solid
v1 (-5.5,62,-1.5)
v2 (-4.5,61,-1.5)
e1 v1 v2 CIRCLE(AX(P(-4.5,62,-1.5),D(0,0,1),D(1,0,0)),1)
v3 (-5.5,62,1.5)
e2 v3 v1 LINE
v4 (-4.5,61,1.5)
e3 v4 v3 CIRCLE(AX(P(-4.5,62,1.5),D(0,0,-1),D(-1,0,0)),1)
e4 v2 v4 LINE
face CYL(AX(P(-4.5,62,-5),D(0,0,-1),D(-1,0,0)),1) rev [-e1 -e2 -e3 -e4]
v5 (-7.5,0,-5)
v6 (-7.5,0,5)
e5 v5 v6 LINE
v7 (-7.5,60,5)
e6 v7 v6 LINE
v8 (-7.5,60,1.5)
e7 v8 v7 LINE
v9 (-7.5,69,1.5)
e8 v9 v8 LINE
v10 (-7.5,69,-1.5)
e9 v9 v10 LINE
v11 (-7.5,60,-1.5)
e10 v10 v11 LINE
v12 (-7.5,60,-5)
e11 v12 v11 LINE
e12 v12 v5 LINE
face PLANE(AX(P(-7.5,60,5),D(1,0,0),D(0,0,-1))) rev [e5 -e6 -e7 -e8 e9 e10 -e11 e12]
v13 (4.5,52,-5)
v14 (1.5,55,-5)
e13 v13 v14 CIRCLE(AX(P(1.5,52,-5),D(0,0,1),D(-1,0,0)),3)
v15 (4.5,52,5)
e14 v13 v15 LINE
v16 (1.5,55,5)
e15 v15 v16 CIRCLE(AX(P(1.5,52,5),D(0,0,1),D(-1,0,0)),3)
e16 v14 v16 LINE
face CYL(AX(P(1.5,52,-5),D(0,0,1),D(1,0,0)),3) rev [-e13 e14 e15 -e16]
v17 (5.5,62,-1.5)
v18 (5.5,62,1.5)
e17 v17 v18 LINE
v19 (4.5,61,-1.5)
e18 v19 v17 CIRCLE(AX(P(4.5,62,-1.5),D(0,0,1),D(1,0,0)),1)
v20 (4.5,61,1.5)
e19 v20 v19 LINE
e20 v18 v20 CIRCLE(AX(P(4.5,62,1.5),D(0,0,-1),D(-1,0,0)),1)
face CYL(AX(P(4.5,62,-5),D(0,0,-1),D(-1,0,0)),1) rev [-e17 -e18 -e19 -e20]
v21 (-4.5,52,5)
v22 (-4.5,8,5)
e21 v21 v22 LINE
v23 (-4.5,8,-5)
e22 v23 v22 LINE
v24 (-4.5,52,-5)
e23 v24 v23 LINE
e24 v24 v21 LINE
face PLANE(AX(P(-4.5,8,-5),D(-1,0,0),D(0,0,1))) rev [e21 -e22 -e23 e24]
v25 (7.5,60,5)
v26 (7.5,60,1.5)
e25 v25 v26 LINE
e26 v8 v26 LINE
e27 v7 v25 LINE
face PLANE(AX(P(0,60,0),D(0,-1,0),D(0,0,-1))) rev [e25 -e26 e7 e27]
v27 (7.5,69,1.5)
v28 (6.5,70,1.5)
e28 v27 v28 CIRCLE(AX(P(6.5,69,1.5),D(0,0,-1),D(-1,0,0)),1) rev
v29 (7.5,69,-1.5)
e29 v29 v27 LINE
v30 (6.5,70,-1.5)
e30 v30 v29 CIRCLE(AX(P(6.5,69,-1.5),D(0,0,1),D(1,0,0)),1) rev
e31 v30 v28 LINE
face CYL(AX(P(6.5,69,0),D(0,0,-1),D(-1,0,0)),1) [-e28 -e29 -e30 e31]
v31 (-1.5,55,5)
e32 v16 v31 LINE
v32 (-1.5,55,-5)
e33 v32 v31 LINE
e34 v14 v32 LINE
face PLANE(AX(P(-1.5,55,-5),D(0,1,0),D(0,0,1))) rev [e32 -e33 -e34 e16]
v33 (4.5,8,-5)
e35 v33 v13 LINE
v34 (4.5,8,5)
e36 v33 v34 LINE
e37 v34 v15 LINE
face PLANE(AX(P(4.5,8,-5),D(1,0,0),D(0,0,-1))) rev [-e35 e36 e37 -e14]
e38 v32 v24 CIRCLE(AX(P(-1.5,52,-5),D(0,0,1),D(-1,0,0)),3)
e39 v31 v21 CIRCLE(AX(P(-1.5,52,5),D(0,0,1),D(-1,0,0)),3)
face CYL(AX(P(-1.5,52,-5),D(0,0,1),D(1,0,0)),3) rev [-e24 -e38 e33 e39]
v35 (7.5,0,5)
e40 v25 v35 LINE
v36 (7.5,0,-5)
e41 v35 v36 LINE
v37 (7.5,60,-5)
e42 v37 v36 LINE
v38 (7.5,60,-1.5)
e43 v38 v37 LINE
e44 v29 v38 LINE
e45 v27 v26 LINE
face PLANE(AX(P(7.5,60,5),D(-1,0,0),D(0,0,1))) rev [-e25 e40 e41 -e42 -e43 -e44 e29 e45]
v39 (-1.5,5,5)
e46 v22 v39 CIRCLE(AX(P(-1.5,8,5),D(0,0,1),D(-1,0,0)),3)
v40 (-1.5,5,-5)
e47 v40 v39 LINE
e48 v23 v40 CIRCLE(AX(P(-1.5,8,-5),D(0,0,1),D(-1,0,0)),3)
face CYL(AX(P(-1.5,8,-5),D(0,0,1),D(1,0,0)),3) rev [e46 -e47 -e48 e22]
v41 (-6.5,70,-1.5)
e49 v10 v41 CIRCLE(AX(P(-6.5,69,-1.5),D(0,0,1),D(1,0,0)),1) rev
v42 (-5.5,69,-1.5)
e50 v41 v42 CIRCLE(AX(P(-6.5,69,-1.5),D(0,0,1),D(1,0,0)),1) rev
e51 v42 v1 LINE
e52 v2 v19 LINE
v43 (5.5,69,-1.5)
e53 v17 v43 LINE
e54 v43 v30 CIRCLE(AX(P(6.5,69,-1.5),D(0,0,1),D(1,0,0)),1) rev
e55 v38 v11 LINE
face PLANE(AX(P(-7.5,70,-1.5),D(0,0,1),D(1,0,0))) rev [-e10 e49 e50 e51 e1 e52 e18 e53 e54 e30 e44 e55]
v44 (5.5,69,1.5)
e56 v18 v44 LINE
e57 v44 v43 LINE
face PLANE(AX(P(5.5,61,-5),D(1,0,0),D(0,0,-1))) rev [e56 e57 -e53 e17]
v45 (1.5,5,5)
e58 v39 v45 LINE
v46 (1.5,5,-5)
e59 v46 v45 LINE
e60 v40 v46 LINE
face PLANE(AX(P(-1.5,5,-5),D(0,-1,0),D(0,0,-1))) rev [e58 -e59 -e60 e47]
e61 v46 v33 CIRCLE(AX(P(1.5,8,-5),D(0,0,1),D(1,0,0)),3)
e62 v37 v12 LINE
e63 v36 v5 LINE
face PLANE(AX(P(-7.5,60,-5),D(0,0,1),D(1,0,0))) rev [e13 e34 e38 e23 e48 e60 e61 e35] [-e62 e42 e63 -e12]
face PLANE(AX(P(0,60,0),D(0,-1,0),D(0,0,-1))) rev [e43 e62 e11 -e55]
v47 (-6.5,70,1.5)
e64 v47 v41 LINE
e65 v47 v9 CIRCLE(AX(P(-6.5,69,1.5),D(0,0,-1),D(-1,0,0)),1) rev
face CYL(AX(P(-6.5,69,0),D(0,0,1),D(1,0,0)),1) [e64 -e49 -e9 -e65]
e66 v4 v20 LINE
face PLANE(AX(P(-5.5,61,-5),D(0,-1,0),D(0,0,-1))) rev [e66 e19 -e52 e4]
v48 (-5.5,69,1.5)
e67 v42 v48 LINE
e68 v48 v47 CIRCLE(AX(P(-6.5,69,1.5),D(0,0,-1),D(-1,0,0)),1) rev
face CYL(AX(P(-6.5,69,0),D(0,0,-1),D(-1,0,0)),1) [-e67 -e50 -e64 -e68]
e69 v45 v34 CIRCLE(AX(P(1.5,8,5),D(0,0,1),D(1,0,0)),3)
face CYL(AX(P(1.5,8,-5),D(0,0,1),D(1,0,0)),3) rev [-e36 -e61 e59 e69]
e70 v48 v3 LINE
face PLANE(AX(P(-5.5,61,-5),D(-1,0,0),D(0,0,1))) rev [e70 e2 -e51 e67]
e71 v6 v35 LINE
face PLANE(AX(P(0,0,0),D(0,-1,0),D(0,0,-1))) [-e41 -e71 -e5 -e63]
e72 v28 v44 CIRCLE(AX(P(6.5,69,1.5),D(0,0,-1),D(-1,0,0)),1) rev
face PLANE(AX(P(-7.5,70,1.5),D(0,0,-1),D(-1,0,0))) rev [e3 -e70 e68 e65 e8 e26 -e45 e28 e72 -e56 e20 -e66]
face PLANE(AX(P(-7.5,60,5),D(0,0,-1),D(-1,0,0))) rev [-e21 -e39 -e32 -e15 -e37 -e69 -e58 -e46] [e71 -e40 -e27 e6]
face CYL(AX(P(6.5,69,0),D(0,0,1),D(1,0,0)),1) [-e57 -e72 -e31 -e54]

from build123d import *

# Parameters (mm, degrees)
SKETCH1_W           = 15
SKETCH1_H           = 10
BOSS_EXTRUDE1_DEPTH = 60
SKETCH2_W           = 15
SKETCH2_H           = 3
BOSS_EXTRUDE2_DEPTH = 10
SKETCH3_W           = 11
SKETCH3_H           = 18.791084145
CUT_EXTRUDE1_DEPTH  = 71.700070721
FILLET1_R           = 1
CUT_EXTRUDE2_DEPTH  = 72.107313267


with BuildPart() as part:
    # Sketch1 → Boss-Extrude1 (new body)
    with BuildSketch(Plane(origin=(0, 0, 0), x_dir=(1, 0, 0), z_dir=(0, 1, 0))):
        Rectangle(SKETCH1_W, SKETCH1_H)
    extrude(amount=BOSS_EXTRUDE1_DEPTH)

    # Sketch2 → Boss-Extrude2 (add)
    with BuildSketch(Plane(origin=(0, 60, 0), x_dir=(1, 0, 0), z_dir=(0, 1, 0))):
        Rectangle(SKETCH2_W, SKETCH2_H)
    extrude(amount=BOSS_EXTRUDE2_DEPTH)

    # Sketch3 → Cut-Extrude1 (cut, through all)
    with BuildSketch(Plane.XY.offset(1.5)):
        with Locations((0, 70.395542073)):
            Rectangle(SKETCH3_W, SKETCH3_H)
    extrude(amount=-CUT_EXTRUDE1_DEPTH, mode=Mode.SUBTRACT)

    # Fillet1
    fillet1_edges = [part.edges().sort_by_distance(p)[0] for p in [
        (-5.5, 70, 0),
        (5.5, 70, 0),
        (5.5, 61, 0),
        (-5.5, 61, 0),
        (-7.5, 70, 0),
        (7.5, 70, 0),
    ]]
    fillet(fillet1_edges, radius=FILLET1_R - 0.0001)  # a hair under: the kernel refuses the full size

    # Sketch4 → Cut-Extrude2 (cut, through all)
    with BuildSketch(Plane.XY.offset(5)):
        with BuildLine():
            Line((-1.5, 5), (1.5, 5))
            ThreePointArc((1.5, 5), (3.621320344, 5.878679656), (4.5, 8))
            Line((4.5, 8), (4.5, 52))
            ThreePointArc((4.5, 52), (3.621320344, 54.121320344), (1.5, 55))
            Line((1.5, 55), (-1.5, 55))
            ThreePointArc((-1.5, 55), (-3.621320344, 54.121320344), (-4.5, 52))
            Line((-4.5, 52), (-4.5, 8))
            ThreePointArc((-4.5, 8), (-3.621320344, 5.878679656), (-1.5, 5))
        make_face()
    extrude(amount=-CUT_EXTRUDE2_DEPTH, mode=Mode.SUBTRACT)


solid = part.part
